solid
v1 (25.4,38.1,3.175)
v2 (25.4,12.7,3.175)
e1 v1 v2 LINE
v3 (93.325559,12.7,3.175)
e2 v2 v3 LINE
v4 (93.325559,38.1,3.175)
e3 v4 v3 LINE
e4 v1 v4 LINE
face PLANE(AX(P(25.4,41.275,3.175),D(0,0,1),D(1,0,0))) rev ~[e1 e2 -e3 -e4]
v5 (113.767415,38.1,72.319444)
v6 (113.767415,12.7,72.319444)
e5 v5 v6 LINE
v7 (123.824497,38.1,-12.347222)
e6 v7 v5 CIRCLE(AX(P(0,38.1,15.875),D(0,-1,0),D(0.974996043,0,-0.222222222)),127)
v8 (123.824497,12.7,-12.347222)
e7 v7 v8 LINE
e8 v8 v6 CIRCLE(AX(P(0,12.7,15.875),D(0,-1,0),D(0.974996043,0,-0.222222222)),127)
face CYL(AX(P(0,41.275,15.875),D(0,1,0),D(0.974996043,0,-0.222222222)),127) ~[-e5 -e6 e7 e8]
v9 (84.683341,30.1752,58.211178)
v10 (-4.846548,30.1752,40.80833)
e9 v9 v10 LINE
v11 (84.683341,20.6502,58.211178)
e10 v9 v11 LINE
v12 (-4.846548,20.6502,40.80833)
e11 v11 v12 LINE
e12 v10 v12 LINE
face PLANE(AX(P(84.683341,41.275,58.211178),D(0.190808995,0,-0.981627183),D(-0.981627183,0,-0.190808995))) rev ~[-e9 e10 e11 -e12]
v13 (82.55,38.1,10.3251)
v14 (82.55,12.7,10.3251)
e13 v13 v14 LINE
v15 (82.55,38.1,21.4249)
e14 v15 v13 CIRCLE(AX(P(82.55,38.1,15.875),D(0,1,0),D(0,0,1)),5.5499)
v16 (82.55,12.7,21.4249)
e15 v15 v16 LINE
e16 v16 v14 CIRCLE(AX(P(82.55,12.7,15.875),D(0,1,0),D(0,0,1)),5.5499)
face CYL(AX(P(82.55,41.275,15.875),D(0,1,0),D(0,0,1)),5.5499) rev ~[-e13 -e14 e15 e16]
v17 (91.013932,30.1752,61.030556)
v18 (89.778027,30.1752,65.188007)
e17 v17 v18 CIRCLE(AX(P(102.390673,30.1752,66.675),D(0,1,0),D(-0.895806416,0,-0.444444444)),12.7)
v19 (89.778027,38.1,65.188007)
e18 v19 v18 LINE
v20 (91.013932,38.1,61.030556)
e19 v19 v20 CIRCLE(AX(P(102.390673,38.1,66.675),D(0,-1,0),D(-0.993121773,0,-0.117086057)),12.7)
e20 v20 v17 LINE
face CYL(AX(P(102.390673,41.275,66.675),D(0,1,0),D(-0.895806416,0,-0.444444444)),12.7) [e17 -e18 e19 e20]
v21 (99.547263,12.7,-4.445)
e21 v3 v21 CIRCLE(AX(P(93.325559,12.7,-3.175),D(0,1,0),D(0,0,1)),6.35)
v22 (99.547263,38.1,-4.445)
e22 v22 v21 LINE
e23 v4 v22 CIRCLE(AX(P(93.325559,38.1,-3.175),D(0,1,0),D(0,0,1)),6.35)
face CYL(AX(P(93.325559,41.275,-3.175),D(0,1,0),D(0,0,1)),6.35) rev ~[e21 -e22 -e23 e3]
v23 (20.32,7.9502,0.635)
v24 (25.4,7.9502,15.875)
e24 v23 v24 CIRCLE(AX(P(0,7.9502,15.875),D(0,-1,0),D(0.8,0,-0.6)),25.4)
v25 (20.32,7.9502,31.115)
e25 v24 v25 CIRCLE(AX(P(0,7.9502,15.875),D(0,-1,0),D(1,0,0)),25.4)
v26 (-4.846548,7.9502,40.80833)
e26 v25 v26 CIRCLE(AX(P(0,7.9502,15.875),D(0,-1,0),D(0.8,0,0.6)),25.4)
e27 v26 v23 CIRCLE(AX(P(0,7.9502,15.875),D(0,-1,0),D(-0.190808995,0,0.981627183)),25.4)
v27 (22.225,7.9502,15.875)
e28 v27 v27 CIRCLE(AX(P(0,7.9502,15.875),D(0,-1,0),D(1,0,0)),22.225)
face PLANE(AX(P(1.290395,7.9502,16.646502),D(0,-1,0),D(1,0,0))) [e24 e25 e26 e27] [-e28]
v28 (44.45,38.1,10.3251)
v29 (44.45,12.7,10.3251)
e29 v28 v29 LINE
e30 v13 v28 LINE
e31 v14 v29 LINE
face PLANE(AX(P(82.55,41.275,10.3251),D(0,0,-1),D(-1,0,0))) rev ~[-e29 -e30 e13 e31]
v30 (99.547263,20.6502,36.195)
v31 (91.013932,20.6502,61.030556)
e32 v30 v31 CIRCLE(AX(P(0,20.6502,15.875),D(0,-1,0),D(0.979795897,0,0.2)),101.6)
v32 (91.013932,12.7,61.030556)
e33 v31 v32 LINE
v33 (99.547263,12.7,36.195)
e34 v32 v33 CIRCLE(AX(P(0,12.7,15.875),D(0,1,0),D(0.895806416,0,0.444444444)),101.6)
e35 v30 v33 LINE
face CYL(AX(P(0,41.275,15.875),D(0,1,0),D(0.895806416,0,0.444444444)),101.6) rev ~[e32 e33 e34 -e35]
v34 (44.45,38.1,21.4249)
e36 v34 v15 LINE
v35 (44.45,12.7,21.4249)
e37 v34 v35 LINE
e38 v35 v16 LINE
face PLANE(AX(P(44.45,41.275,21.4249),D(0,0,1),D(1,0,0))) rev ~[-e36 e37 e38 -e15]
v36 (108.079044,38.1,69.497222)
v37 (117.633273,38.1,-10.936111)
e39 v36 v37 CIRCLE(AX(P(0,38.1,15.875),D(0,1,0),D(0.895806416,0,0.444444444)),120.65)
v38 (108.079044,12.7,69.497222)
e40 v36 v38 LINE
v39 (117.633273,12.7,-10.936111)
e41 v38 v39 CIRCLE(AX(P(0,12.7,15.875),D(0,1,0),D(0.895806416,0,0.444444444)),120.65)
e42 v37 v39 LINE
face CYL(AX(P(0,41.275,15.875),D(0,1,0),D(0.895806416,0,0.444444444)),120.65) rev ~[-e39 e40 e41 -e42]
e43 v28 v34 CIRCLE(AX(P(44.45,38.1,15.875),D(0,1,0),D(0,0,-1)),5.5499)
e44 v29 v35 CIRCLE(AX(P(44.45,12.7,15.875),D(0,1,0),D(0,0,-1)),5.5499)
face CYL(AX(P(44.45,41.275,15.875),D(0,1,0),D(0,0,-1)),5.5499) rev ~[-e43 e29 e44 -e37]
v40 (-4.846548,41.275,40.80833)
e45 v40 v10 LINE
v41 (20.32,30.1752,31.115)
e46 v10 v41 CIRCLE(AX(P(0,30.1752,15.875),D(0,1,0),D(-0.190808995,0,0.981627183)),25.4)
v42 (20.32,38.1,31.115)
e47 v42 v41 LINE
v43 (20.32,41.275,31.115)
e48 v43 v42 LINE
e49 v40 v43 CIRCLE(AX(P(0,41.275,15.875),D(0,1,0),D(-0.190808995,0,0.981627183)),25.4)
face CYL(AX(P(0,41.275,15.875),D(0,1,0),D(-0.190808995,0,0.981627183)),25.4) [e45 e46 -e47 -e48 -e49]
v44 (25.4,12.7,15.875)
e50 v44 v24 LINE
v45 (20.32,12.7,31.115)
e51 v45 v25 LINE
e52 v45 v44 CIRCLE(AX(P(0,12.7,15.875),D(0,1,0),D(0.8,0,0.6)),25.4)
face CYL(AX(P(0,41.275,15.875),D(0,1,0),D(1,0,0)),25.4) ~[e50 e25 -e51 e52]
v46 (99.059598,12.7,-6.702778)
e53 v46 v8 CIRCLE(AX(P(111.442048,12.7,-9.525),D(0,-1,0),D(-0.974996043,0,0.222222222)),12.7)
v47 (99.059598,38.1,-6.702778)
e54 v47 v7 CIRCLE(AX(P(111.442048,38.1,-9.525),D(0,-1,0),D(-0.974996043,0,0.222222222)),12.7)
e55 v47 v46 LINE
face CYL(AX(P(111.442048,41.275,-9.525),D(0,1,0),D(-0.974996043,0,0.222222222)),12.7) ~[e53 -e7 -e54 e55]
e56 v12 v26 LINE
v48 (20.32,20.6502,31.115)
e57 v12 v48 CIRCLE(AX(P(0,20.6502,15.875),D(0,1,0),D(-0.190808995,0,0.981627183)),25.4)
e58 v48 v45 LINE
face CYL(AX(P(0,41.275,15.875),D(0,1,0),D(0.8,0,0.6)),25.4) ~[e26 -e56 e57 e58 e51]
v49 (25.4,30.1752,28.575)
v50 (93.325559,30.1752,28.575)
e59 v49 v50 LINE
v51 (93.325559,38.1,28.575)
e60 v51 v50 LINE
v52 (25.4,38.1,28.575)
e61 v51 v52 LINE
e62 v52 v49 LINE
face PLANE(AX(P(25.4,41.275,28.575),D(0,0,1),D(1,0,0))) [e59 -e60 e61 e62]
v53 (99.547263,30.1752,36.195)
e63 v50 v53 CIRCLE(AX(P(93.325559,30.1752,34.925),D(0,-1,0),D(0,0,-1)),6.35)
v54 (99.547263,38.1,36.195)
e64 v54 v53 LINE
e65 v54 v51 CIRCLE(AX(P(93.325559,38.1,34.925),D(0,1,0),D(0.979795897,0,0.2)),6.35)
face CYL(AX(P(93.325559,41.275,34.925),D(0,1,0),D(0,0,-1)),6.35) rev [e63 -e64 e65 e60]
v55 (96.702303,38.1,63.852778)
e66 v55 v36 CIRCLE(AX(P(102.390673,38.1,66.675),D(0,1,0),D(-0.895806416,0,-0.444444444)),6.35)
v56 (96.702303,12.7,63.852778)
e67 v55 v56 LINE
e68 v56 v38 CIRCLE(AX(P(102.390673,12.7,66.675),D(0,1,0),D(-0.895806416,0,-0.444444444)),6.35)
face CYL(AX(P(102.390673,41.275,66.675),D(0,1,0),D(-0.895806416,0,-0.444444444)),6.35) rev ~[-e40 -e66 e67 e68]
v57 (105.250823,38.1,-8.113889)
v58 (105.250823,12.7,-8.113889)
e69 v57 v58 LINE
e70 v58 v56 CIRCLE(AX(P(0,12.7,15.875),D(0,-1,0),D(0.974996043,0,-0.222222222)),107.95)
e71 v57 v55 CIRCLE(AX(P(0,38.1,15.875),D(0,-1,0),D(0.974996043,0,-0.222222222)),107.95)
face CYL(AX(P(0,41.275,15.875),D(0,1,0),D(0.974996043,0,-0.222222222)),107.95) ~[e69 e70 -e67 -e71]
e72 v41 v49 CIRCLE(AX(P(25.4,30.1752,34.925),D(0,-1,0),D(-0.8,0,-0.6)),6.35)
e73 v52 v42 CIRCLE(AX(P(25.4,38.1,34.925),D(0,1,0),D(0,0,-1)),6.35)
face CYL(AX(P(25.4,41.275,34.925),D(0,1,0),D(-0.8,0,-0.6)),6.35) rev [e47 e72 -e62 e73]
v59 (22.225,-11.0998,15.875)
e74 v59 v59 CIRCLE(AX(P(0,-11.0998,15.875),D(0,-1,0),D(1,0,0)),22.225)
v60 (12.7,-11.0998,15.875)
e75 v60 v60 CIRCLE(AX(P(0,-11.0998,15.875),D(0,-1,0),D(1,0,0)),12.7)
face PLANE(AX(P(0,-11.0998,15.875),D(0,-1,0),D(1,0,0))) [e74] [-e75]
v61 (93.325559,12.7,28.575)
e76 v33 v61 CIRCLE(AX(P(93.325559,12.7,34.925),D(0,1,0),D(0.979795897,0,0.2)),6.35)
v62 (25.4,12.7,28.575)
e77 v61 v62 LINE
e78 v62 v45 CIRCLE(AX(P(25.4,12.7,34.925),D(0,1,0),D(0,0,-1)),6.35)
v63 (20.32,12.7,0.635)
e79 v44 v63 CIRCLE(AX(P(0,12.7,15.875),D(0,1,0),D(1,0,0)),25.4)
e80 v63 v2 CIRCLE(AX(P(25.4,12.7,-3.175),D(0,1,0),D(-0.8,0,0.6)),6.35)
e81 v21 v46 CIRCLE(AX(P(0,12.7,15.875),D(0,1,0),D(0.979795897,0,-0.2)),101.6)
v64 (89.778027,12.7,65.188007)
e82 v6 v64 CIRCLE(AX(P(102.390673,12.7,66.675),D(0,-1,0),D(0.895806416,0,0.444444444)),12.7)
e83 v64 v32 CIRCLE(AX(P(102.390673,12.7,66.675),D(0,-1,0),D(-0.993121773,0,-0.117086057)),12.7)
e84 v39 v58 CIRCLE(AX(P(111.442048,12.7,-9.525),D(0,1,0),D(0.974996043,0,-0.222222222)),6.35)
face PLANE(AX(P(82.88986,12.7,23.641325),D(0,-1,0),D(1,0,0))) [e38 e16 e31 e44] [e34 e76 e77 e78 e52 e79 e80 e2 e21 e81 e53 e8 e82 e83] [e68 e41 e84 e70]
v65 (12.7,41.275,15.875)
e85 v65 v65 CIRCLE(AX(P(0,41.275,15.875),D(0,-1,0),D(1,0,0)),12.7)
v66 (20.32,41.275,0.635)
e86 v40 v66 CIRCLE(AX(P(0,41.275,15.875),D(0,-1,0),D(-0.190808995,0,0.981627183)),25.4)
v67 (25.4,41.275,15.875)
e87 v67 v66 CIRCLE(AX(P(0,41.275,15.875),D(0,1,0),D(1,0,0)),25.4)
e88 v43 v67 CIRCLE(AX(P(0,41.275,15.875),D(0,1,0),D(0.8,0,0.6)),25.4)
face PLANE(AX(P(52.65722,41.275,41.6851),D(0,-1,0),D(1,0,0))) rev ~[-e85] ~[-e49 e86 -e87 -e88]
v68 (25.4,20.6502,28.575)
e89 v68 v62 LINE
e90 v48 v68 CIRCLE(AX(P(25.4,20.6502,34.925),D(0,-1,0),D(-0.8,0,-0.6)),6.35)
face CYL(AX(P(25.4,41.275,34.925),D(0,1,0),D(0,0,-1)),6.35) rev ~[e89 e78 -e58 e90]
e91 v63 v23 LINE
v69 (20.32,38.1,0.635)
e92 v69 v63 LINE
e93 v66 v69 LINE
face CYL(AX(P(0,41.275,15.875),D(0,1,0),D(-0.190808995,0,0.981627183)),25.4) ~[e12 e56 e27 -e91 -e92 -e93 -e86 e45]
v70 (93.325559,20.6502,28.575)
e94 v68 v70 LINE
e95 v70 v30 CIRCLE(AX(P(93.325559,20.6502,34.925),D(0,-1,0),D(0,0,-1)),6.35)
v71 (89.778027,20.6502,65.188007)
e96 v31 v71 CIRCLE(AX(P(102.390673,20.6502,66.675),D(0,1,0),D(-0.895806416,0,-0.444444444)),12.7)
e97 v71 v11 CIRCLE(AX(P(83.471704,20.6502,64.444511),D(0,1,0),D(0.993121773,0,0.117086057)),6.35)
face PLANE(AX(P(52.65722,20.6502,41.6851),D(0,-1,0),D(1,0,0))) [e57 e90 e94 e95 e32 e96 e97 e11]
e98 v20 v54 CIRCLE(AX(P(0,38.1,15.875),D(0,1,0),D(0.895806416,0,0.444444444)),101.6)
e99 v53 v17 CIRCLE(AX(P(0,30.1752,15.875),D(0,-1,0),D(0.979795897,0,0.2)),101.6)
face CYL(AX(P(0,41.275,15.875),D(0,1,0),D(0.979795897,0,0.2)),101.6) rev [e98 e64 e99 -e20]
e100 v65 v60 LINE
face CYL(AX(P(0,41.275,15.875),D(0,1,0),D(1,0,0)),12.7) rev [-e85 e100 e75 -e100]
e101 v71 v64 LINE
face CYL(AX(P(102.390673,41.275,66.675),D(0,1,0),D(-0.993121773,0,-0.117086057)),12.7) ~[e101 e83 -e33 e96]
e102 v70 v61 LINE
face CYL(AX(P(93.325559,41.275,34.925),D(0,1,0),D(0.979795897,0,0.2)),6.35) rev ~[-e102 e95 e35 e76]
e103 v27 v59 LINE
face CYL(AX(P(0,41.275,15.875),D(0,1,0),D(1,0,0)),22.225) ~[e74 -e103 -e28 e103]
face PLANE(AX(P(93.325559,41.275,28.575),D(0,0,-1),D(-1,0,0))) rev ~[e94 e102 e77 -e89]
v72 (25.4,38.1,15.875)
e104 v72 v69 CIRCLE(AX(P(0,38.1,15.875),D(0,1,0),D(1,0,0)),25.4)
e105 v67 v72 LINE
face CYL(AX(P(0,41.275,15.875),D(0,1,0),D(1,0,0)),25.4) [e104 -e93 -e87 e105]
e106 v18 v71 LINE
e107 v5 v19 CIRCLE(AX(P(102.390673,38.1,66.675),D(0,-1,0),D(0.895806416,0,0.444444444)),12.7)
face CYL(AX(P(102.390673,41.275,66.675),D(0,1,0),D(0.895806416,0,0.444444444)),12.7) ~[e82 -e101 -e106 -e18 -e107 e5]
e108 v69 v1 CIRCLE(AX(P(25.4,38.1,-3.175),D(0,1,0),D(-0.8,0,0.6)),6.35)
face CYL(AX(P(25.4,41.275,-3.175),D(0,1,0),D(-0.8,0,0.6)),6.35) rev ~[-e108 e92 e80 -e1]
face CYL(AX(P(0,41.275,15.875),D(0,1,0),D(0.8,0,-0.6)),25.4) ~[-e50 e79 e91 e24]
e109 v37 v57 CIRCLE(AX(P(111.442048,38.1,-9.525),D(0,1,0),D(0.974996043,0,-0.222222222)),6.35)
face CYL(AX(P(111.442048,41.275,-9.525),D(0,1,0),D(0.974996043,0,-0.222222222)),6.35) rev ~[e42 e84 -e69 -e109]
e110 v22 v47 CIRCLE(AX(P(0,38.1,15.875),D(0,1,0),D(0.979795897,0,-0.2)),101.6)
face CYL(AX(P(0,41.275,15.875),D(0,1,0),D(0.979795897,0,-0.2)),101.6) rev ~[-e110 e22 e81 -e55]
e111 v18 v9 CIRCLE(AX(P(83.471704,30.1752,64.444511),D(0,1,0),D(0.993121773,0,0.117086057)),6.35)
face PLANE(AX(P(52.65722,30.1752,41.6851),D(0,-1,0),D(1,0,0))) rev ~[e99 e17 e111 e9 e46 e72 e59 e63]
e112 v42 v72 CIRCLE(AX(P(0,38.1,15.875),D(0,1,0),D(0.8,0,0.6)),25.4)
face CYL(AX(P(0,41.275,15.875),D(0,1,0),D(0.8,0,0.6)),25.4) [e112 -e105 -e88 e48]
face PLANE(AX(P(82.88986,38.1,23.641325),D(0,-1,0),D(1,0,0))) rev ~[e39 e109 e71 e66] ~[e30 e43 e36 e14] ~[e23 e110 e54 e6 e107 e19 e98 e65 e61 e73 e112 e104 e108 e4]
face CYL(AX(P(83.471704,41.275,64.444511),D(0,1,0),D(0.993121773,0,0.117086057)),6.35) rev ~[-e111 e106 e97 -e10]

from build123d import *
from build123d import SkipClean  # not in build123d's __all__

# Parameters (mm, degrees)
F0_R     = 22.225
F1_DEPTH = 33.3248
F0_R_2   = 12.7
F2_DEPTH = 52.3748
F3_DEPTH = 28.575
F4_DEPTH = 20.6248
F5_DEPTH = 3.175
F6_DEPTH = 11.0998
F7_ANGLE = 90


with BuildPart() as f1:
    # F0 (on Top) → F1 (new body)
    with BuildSketch(Plane.XY):
        with BuildLine():
            ThreePointArc((20.32, 15.24), (9.1294627068, 23.7025929106), (-4.8465484826, 24.9333304596))
            ThreePointArc((-4.8465484826, 24.9333304596), (-21.5251259118, -13.4843967044), (20.32, -15.24))
            ThreePointArc((20.32, -15.24), (24.0965557705, -8.0321852568), (25.4, 0))
            ThreePointArc((25.4, 0), (24.0965557705, 8.0321852568), (20.32, 15.24))
        make_face()
        Circle(F0_R, mode=Mode.SUBTRACT)
    extrude(amount=F1_DEPTH)

    # F0 (on Top) → F2 (join)
    with BuildSketch(Plane.XY):
        Circle(F0_R)
        Circle(F0_R_2, mode=Mode.SUBTRACT)
    extrude(amount=F2_DEPTH)

    # F0 (on Top) → F3 (join)
    with BuildSketch(Plane.XY):
        with BuildLine():
            ThreePointArc((123.8244974665, -28.2222222222), (126.1134026015, 14.9803098855), (113.7674148927, 56.4444444444))
            ThreePointArc((113.7674148927, 56.4444444444), (98.7718041015, 62.9734869687), (89.7780268905, 49.313007081))
            ThreePointArc((89.7780268905, 49.313007081), (90.2171864347, 47.1811306981), (91.0139319141, 45.1555555556))
            ThreePointArc((91.0139319141, 45.1555555556), (96.0863854596, 33.0146411355), (99.5472631467, 20.32))
            ThreePointArc((99.5472631467, 20.32), (98.2442480497, 15.0339073716), (93.3255592, 12.7))
            Line((93.3255592, 12.7), (57.15, 12.7))
            Line((57.15, 12.7), (25.4, 12.7))
            ThreePointArc((25.4, 12.7), (22.5601936686, 13.3703873372), (20.32, 15.24))
            ThreePointArc((20.32, 15.24), (24.0965557705, 8.0321852568), (25.4, 0))
            ThreePointArc((25.4, 0), (24.0965557705, -8.0321852568), (20.32, -15.24))
            ThreePointArc((20.32, -15.24), (22.5601936686, -13.3703873372), (25.4, -12.7))
            Line((25.4, -12.7), (54.6792037785, -12.7))
            Line((54.6792037785, -12.7), (93.3255592, -12.7))
            ThreePointArc((93.3255592, -12.7), (98.2442480497, -15.0339073716), (99.5472631467, -20.32))
            ThreePointArc((99.5472631467, -20.32), (99.3098469997, -21.4502747977), (99.0595979732, -22.5777777778))
            ThreePointArc((99.0595979732, -22.5777777778), (108.6198254977, -37.7824497467), (123.8244974665, -28.2222222222))
        make_face()
        with BuildLine():
            ThreePointArc((82.55, 5.5499), (88.0999, 0), (82.55, -5.5499))
            Line((82.55, -5.5499), (44.45, -5.5499))
            ThreePointArc((44.45, -5.5499), (38.9001, 0), (44.45, 5.5499))
            Line((44.45, 5.5499), (82.55, 5.5499))
        make_face(mode=Mode.SUBTRACT)
        with BuildLine():
            ThreePointArc((117.6332725932, -26.8111111111), (110.0309366088, -31.5912248733), (105.2508228466, -23.9888888889))
            ThreePointArc((105.2508228466, -23.9888888889), (107.1963922113, 12.7332634026), (96.7023026588, 47.9777777778))
            ThreePointArc((96.7023026588, 47.9777777778), (99.5684511812, 56.4883707446), (108.079044148, 53.6222222222))
            ThreePointArc((108.079044148, 53.6222222222), (119.8077324715, 14.2312943912), (117.6332725932, -26.8111111111))
        make_face(mode=Mode.SUBTRACT)
    extrude(amount=F3_DEPTH)

    # F0 (on Top) → F4 (join)
    with BuildSketch(Plane.XY):
        with BuildLine():
            ThreePointArc((91.0139319141, 45.1555555556), (90.2171864347, 47.1811306981), (89.7780268905, 49.313007081))
            ThreePointArc((89.7780268905, 49.313007081), (88.599955582, 44.8247099647), (84.6833407547, 42.3361780066))
            Line((84.6833407547, 42.3361780066), (-4.8465484826, 24.9333304596))
            ThreePointArc((-4.8465484826, 24.9333304596), (9.1294627068, 23.7025929106), (20.32, 15.24))
            ThreePointArc((20.32, 15.24), (22.5601936686, 13.3703873372), (25.4, 12.7))
            Line((25.4, 12.7), (57.15, 12.7))
            Line((57.15, 12.7), (93.3255592, 12.7))
            ThreePointArc((93.3255592, 12.7), (98.2442480497, 15.0339073716), (99.5472631467, 20.32))
            ThreePointArc((99.5472631467, 20.32), (96.0863854596, 33.0146411355), (91.0139319141, 45.1555555556))
        make_face()
    extrude(amount=F4_DEPTH)

    # F0 (on Top) → F5 (cut)
    with BuildSketch(Plane.XY):
        with BuildLine():
            ThreePointArc((123.8244974665, -28.2222222222), (126.1134026015, 14.9803098855), (113.7674148927, 56.4444444444))
            ThreePointArc((113.7674148927, 56.4444444444), (98.7718041015, 62.9734869687), (89.7780268905, 49.313007081))
            ThreePointArc((89.7780268905, 49.313007081), (90.2171864347, 47.1811306981), (91.0139319141, 45.1555555556))
            ThreePointArc((91.0139319141, 45.1555555556), (96.0863854596, 33.0146411355), (99.5472631467, 20.32))
            ThreePointArc((99.5472631467, 20.32), (98.2442480497, 15.0339073716), (93.3255592, 12.7))
            Line((93.3255592, 12.7), (57.15, 12.7))
            Line((57.15, 12.7), (25.4, 12.7))
            ThreePointArc((25.4, 12.7), (22.5601936686, 13.3703873372), (20.32, 15.24))
            ThreePointArc((20.32, 15.24), (24.0965557705, 8.0321852568), (25.4, 0))
            ThreePointArc((25.4, 0), (24.0965557705, -8.0321852568), (20.32, -15.24))
            ThreePointArc((20.32, -15.24), (22.5601936686, -13.3703873372), (25.4, -12.7))
            Line((25.4, -12.7), (54.6792037785, -12.7))
            Line((54.6792037785, -12.7), (93.3255592, -12.7))
            ThreePointArc((93.3255592, -12.7), (98.2442480497, -15.0339073716), (99.5472631467, -20.32))
            ThreePointArc((99.5472631467, -20.32), (99.3098469997, -21.4502747977), (99.0595979732, -22.5777777778))
            ThreePointArc((99.0595979732, -22.5777777778), (108.6198254977, -37.7824497467), (123.8244974665, -28.2222222222))
        make_face()
        with BuildLine():
            ThreePointArc((82.55, 5.5499), (88.0999, 0), (82.55, -5.5499))
            Line((82.55, -5.5499), (44.45, -5.5499))
            ThreePointArc((44.45, -5.5499), (38.9001, 0), (44.45, 5.5499))
            Line((44.45, 5.5499), (82.55, 5.5499))
        make_face(mode=Mode.SUBTRACT)
        with BuildLine():
            ThreePointArc((117.6332725932, -26.8111111111), (110.0309366088, -31.5912248733), (105.2508228466, -23.9888888889))
            ThreePointArc((105.2508228466, -23.9888888889), (107.1963922113, 12.7332634026), (96.7023026588, 47.9777777778))
            ThreePointArc((96.7023026588, 47.9777777778), (99.5684511812, 56.4883707446), (108.079044148, 53.6222222222))
            ThreePointArc((108.079044148, 53.6222222222), (119.8077324715, 14.2312943912), (117.6332725932, -26.8111111111))
        make_face(mode=Mode.SUBTRACT)
    with SkipClean():  # cleaning this boolean's faces spoils the solid; the shape is the same uncleaned
        extrude(amount=F5_DEPTH, mode=Mode.SUBTRACT)

    # F0 (on Top) → F6 (cut)
    with BuildSketch(Plane.XY):
        with BuildLine():
            ThreePointArc((91.0139319141, 45.1555555556), (90.2171864347, 47.1811306981), (89.7780268905, 49.313007081))
            ThreePointArc((89.7780268905, 49.313007081), (88.599955582, 44.8247099647), (84.6833407547, 42.3361780066))
            Line((84.6833407547, 42.3361780066), (-4.8465484826, 24.9333304596))
            ThreePointArc((-4.8465484826, 24.9333304596), (9.1294627068, 23.7025929106), (20.32, 15.24))
            ThreePointArc((20.32, 15.24), (22.5601936686, 13.3703873372), (25.4, 12.7))
            Line((25.4, 12.7), (57.15, 12.7))
            Line((57.15, 12.7), (93.3255592, 12.7))
            ThreePointArc((93.3255592, 12.7), (98.2442480497, 15.0339073716), (99.5472631467, 20.32))
            ThreePointArc((99.5472631467, 20.32), (96.0863854596, 33.0146411355), (91.0139319141, 45.1555555556))
        make_face()
    with SkipClean():  # cleaning this boolean's faces spoils the solid; the shape is the same uncleaned
        extrude(amount=F6_DEPTH, mode=Mode.SUBTRACT)


with BuildPart() as f1_1:
    # F7: moved
    add(f1.part.rotate(Axis((59.3627796, 12.7, 28.575), (1, 0, 0)), F7_ANGLE), clean=False)


solid = f1_1.part
